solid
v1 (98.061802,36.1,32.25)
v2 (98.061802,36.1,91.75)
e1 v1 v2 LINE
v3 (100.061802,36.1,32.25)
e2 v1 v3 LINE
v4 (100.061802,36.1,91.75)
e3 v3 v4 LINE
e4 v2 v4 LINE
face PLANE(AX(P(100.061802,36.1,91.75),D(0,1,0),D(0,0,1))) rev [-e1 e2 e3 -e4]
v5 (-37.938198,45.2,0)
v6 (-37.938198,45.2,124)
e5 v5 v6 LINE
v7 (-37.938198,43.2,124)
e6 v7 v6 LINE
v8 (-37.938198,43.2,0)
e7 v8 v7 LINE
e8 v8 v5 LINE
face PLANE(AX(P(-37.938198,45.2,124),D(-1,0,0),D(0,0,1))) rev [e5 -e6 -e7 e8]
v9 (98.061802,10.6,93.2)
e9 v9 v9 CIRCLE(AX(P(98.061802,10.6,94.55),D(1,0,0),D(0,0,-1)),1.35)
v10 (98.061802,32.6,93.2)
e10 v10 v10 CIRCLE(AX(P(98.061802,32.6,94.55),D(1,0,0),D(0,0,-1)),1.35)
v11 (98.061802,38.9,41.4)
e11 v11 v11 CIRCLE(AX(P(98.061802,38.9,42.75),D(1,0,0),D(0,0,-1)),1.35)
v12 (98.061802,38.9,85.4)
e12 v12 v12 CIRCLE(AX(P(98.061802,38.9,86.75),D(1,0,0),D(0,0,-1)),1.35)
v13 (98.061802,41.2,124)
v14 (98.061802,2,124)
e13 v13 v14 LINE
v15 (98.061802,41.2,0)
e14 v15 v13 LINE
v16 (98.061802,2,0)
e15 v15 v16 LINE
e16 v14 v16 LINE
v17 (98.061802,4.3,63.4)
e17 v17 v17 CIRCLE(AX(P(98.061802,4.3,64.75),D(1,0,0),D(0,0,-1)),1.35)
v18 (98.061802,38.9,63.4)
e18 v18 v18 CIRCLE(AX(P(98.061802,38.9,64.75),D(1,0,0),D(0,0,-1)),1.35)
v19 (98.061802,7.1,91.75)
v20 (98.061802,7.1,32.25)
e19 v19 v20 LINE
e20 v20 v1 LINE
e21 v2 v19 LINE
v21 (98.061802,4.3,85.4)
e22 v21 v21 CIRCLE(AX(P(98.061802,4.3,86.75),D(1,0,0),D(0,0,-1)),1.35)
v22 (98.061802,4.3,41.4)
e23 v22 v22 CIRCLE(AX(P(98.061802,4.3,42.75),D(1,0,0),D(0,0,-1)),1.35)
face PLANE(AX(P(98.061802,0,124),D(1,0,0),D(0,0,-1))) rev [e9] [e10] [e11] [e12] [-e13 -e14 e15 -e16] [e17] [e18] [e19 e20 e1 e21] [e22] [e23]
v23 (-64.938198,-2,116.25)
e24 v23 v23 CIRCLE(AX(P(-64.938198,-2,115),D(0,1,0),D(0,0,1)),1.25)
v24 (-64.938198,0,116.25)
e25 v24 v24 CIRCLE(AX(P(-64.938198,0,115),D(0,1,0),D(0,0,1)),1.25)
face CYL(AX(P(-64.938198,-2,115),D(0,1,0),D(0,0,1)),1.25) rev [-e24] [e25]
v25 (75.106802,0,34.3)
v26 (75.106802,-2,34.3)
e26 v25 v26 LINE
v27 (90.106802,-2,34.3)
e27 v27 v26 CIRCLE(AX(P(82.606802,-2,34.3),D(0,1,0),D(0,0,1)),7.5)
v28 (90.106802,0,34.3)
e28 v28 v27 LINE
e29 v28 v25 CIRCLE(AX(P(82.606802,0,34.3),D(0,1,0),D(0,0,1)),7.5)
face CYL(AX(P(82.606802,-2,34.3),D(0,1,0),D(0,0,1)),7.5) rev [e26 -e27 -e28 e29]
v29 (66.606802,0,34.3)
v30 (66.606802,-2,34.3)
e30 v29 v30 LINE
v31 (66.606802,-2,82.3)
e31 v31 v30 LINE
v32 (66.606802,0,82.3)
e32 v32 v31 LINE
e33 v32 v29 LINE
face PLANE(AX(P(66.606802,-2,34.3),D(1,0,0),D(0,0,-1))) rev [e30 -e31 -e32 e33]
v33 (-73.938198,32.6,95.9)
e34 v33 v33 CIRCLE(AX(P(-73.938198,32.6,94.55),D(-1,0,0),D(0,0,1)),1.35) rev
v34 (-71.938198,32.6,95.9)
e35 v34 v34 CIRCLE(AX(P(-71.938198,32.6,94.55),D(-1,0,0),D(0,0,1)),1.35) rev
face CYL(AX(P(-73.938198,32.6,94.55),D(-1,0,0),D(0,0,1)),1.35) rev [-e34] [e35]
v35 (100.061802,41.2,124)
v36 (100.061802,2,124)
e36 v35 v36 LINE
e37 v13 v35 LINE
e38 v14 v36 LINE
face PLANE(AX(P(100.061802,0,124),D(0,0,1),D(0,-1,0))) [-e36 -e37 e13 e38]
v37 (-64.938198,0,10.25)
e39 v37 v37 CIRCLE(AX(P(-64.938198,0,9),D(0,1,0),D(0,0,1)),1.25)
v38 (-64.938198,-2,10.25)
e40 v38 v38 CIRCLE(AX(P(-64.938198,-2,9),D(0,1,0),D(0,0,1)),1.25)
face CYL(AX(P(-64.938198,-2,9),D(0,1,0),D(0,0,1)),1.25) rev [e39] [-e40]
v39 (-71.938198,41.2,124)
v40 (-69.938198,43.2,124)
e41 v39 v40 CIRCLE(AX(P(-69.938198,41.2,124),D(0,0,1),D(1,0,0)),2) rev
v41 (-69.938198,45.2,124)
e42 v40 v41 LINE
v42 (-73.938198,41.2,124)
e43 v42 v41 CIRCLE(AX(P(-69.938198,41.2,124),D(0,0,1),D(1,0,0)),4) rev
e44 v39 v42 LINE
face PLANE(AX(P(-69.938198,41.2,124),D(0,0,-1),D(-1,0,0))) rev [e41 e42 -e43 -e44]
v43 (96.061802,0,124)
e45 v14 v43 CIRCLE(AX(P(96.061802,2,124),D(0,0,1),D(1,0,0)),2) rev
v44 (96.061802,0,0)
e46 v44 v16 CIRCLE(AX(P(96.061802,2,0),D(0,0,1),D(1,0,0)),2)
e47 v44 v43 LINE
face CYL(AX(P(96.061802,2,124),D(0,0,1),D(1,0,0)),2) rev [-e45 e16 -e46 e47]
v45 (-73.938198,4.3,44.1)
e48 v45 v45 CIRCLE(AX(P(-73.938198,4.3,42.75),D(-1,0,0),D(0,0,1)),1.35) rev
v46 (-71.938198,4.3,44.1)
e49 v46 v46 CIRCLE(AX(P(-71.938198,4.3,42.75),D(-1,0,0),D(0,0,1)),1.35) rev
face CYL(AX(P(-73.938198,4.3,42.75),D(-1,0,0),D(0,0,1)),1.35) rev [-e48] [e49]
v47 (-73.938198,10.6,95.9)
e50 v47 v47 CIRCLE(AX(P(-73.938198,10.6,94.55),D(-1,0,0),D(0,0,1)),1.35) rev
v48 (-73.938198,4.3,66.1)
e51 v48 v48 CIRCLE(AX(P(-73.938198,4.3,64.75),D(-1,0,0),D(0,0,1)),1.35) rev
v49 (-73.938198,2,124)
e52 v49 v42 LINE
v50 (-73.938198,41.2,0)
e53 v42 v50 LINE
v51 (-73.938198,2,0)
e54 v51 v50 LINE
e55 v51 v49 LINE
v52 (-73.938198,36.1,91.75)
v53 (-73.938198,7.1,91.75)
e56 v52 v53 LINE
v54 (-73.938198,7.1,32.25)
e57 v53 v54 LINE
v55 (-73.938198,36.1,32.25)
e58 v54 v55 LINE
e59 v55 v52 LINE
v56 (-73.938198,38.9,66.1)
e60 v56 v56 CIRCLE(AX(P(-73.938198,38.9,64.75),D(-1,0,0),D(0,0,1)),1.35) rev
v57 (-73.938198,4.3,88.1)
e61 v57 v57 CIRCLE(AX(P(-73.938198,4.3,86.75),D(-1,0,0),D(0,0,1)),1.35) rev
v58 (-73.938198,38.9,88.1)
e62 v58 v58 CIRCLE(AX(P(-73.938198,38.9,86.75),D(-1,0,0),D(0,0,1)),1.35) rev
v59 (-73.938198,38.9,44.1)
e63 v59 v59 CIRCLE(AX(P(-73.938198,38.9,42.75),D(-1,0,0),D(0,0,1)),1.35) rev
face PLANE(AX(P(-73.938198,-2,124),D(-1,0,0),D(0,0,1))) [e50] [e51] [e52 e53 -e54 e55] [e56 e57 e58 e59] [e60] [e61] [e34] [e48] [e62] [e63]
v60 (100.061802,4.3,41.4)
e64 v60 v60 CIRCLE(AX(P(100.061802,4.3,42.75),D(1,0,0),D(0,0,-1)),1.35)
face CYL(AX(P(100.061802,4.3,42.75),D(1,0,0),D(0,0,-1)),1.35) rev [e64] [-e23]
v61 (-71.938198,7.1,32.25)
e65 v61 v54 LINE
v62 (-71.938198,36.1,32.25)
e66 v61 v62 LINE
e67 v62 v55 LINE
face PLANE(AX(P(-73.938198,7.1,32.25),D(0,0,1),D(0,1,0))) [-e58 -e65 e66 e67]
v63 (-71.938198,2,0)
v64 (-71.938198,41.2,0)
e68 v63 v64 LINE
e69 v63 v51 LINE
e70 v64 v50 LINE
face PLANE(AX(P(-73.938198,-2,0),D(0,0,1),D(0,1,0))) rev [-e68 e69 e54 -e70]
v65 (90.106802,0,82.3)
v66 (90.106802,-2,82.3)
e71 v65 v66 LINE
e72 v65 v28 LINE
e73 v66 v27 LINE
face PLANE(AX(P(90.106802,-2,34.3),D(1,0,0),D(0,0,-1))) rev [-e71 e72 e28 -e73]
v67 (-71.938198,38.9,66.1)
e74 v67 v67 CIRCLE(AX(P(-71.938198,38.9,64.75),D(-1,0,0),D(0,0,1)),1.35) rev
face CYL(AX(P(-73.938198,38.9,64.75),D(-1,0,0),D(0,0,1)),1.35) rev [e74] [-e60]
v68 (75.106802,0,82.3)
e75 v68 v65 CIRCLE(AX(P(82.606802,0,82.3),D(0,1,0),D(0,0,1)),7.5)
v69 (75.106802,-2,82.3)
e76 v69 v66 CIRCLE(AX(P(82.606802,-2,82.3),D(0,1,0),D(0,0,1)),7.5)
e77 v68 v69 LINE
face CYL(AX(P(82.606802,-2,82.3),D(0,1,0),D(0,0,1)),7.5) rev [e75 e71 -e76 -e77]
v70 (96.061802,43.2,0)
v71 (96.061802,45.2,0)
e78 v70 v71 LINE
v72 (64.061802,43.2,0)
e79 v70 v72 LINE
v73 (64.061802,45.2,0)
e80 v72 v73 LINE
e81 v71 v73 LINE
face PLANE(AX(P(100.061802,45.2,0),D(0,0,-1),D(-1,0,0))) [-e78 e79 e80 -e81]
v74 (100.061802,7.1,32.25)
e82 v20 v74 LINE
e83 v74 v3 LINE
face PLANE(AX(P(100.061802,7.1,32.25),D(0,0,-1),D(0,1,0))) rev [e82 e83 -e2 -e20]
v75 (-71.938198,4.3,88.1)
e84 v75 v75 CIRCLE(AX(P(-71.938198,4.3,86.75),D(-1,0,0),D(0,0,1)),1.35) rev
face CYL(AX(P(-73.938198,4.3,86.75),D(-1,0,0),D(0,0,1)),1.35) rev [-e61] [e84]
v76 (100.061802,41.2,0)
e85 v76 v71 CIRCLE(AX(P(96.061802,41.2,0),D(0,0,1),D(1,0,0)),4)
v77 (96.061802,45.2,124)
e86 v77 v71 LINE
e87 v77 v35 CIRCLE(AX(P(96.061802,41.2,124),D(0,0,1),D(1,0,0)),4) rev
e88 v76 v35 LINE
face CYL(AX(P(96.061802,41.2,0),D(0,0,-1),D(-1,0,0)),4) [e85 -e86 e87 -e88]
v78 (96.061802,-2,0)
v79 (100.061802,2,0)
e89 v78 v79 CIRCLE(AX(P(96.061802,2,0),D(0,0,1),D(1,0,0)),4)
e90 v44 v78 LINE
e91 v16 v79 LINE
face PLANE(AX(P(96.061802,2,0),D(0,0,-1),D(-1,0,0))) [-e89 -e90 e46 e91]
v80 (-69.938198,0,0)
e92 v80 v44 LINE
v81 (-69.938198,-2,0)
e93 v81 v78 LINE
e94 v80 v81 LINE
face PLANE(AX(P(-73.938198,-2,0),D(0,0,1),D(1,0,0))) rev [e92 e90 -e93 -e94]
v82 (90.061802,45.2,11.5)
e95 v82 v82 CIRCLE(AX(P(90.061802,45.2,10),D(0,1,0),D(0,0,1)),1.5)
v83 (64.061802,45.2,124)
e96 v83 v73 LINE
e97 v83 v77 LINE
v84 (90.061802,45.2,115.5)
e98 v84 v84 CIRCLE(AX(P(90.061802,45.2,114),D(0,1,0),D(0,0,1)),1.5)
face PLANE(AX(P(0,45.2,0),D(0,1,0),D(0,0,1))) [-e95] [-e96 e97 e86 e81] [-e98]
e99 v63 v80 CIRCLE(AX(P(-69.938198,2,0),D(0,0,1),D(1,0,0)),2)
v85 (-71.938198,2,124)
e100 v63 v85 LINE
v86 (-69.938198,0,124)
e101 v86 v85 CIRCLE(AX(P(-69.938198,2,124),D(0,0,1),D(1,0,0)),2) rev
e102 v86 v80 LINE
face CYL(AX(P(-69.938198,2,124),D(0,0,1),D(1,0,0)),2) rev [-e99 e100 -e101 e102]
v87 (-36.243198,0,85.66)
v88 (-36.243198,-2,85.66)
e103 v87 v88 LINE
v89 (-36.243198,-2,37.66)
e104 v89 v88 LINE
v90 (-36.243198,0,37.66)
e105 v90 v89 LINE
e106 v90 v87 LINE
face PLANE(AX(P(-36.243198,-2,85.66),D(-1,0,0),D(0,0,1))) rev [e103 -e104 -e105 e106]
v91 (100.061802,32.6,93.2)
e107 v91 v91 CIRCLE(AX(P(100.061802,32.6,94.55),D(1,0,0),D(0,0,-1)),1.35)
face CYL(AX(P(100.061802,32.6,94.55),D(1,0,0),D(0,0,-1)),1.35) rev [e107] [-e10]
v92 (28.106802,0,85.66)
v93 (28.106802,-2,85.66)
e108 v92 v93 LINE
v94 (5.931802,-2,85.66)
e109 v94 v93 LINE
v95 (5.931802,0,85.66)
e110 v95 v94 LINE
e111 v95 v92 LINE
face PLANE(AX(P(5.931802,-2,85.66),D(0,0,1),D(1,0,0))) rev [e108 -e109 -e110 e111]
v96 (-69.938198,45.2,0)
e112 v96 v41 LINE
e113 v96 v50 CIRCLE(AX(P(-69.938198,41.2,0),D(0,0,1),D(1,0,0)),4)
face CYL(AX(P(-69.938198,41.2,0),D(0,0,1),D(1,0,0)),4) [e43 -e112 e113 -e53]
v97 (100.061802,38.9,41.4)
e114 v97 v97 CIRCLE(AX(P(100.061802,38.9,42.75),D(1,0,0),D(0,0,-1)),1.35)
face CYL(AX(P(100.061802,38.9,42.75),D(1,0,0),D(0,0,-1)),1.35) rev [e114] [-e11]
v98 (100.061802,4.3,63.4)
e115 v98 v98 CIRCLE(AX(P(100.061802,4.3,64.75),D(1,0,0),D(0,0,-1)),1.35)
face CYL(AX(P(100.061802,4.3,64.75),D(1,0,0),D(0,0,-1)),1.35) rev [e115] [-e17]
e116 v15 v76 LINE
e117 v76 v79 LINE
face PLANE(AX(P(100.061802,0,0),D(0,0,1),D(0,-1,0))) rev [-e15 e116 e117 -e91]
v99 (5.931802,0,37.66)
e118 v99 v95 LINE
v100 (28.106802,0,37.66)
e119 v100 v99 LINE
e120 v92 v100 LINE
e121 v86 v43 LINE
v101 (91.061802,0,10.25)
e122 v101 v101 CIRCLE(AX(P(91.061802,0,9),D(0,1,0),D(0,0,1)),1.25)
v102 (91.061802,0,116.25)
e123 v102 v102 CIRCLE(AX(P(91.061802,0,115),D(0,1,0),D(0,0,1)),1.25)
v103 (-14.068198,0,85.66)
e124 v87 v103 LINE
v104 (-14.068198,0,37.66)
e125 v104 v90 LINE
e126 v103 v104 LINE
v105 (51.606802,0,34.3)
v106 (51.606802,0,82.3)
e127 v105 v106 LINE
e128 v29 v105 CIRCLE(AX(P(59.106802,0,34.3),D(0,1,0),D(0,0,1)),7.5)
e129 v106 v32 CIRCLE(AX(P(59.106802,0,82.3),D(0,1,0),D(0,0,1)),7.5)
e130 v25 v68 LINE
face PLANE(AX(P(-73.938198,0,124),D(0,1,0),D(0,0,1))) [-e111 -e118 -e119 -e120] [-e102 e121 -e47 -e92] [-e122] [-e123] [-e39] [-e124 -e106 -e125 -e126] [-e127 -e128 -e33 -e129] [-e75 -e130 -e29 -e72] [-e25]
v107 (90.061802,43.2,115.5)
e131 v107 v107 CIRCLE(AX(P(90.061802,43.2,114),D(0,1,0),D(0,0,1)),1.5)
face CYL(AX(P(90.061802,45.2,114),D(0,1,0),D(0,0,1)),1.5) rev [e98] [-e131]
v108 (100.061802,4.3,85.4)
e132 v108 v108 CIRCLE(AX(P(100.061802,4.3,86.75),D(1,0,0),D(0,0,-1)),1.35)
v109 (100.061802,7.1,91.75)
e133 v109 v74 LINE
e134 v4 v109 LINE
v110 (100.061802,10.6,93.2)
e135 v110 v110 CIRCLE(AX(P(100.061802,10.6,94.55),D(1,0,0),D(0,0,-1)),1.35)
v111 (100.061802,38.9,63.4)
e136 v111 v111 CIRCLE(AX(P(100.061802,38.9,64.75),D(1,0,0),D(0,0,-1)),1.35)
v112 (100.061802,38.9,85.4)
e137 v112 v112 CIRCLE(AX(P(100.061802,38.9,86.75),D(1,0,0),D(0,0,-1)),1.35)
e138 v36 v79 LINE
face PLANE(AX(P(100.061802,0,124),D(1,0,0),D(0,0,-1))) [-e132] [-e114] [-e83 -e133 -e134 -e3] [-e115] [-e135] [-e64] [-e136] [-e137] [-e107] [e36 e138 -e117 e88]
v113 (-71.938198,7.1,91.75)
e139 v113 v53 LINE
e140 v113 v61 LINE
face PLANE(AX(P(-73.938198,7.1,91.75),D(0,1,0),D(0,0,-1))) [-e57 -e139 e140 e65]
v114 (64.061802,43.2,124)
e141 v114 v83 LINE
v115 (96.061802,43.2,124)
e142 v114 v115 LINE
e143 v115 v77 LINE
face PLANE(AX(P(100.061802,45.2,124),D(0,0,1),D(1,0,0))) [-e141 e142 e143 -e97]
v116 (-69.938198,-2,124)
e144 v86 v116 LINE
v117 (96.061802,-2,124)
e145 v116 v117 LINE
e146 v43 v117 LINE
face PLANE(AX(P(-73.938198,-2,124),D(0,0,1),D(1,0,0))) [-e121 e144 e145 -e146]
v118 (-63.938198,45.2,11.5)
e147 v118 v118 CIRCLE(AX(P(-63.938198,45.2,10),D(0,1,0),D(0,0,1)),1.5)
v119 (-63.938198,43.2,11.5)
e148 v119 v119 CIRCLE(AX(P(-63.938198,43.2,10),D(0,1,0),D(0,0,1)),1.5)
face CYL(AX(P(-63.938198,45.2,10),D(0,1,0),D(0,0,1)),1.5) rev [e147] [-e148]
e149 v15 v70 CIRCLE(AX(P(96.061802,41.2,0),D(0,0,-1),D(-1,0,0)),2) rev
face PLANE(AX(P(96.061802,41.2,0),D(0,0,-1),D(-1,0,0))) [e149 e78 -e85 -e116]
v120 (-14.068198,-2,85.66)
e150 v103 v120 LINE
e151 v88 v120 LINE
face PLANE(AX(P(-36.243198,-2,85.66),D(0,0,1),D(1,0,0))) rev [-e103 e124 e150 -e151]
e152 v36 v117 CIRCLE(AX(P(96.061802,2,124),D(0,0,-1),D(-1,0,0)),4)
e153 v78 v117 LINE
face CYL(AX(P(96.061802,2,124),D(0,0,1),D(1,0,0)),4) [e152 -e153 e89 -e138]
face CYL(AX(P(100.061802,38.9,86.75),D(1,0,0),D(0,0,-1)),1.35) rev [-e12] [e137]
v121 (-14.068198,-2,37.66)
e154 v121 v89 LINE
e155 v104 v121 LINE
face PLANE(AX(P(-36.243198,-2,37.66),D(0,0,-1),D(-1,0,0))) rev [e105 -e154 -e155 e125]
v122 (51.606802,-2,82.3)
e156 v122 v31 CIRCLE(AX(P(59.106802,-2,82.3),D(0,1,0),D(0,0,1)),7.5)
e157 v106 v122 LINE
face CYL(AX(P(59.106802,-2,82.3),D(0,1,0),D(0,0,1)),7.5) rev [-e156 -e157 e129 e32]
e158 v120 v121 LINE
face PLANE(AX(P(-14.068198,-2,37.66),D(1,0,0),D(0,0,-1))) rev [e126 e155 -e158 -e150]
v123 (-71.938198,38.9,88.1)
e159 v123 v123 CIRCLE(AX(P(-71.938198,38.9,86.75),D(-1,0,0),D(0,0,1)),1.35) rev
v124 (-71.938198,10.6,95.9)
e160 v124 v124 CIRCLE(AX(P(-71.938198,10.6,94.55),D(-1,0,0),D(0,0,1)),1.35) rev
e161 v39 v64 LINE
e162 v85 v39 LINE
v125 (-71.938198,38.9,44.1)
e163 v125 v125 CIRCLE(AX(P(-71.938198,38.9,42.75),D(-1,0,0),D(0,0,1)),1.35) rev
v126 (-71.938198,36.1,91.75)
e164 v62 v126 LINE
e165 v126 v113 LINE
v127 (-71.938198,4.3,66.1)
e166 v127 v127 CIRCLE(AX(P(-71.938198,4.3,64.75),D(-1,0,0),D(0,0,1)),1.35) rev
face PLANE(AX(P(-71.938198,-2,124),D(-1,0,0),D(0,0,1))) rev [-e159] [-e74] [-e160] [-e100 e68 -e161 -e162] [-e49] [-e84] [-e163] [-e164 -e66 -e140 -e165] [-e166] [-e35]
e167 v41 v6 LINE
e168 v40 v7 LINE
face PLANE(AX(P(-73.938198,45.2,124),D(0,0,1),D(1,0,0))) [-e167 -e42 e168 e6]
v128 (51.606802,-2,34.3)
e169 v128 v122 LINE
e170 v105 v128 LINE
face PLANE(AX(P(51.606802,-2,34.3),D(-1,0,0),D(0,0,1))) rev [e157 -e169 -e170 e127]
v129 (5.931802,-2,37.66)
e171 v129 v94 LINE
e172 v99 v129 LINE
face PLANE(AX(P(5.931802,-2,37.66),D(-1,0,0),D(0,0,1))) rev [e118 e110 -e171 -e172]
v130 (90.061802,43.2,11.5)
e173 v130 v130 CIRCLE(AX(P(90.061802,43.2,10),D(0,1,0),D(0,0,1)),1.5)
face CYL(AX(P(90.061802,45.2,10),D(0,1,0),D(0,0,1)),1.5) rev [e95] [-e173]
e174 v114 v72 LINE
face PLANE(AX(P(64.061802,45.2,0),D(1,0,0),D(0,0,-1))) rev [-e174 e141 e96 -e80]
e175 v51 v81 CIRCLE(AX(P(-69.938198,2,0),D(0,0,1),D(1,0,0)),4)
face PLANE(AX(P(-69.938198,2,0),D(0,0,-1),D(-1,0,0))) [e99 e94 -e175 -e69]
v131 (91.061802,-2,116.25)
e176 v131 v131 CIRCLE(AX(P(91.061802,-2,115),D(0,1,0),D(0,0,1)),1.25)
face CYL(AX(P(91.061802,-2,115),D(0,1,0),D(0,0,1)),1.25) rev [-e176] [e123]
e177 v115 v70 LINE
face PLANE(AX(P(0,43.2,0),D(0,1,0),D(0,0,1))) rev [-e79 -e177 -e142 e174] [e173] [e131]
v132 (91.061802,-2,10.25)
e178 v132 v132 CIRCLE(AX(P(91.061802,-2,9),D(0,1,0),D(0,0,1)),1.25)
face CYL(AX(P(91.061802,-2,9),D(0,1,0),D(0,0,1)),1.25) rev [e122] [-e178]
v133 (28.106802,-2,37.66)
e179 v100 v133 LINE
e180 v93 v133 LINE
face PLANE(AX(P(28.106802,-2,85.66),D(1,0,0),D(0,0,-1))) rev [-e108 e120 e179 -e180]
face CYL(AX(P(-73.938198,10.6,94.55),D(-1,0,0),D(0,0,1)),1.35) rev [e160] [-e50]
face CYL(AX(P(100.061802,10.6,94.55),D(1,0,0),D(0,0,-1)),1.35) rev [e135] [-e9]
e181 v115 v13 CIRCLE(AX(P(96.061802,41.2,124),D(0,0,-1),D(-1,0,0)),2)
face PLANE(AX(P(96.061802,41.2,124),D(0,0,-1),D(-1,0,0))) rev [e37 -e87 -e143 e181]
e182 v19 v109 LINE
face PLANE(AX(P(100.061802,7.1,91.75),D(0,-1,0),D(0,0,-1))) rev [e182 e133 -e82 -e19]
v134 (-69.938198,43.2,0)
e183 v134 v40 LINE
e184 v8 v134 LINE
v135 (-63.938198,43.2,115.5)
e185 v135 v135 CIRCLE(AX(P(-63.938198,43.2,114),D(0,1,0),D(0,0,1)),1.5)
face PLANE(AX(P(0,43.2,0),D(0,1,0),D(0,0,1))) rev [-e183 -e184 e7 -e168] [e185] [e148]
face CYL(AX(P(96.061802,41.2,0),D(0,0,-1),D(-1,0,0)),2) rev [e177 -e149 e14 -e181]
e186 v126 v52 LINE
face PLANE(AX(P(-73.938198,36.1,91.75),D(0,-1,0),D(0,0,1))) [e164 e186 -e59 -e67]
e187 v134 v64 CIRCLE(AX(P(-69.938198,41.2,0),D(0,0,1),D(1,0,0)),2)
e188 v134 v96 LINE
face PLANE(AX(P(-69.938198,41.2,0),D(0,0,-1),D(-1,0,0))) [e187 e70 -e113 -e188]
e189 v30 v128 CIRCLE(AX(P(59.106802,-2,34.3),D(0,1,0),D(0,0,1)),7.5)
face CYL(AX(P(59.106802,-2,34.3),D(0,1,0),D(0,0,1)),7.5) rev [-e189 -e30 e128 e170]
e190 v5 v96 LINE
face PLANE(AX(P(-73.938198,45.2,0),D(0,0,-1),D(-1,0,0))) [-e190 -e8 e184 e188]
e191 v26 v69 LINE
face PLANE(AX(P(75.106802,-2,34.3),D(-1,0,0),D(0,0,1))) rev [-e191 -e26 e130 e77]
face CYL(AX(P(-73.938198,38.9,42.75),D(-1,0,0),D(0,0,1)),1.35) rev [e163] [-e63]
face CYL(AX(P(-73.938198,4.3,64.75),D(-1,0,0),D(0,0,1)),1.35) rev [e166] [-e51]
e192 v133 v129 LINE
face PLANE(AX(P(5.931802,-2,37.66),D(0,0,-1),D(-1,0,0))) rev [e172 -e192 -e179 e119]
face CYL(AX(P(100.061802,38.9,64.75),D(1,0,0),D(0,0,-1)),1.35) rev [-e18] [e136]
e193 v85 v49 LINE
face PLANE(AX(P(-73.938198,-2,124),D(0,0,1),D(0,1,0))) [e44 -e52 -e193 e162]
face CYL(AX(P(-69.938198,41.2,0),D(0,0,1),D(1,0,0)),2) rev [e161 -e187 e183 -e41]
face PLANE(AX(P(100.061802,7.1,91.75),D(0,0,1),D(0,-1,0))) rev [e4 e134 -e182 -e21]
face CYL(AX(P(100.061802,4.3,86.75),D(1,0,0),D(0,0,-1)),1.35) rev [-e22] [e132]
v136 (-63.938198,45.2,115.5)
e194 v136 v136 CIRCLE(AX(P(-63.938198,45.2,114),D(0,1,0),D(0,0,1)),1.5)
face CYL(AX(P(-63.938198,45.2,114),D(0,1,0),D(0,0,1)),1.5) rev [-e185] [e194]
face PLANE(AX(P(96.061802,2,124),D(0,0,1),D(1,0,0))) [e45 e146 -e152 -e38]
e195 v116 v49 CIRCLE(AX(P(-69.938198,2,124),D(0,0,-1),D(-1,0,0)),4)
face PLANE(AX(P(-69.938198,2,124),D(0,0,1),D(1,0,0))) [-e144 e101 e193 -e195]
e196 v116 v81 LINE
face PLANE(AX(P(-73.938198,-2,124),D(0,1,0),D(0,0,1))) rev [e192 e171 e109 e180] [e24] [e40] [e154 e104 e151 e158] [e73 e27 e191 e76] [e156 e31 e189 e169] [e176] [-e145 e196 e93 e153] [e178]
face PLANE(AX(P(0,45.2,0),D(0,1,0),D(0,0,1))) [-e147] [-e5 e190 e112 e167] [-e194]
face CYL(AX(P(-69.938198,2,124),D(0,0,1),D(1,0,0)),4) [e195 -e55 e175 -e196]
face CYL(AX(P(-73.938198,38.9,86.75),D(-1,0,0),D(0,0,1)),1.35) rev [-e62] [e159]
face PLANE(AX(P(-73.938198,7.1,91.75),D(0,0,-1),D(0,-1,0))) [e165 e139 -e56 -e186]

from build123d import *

# Parameters (mm, degrees)
ESBO_O1_W                 = 174
ESBO_O1_H                 = 2
EXTRUS_O_FINA1_DEPTH      = 124
ESBO_O2_R                 = 1.25
CORTE_EXTRUS_O1_DEPTH     = 10
ESBO_O3_W                 = 2
ESBO_O3_H                 = 124
RESSALTO_EXTRUS_O1_DEPTH  = 45.2
ESBO_O4_W                 = 124
ESBO_O4_H                 = 2
RESSALTO_EXTRUS_O2_DEPTH  = 34
ESBO_O5_W                 = 124
ESBO_O5_H                 = 2
RESSALTO_EXTRUS_O3_DEPTH  = 34
CORTE_EXTRUS_O2_REACH     = 220.392
ESBO_O6_R                 = 1.35
ESBO_O6_W                 = 59.5
ESBO_O6_H                 = 29
ESBO_O7_R                 = 1.5
CORTE_EXTRUS_O3_DEPTH     = 2
ESBO_O8_W                 = 22.175
ESBO_O8_H                 = 48
CORTE_EXTRUS_O4_DEPTH     = 2
CONVERTER_S_LIDO1_DEPTH   = 124
CONVERTER_S_LIDO1_2_DEPTH = 124


# Read off the part's stored shape, not the designer's step: Converter-Sólido1
with BuildPart() as part:
    # Esboço1 → Extrusão-Fina1 (new body)
    with BuildSketch(Plane.XY):
        with Locations((13.061802497, -1)):
            Rectangle(ESBO_O1_W, ESBO_O1_H)
    extrude(amount=EXTRUS_O_FINA1_DEPTH)

    # Esboço2 → Corte-extrusão1 (cut)
    with BuildSketch(Plane(origin=(0, 0, 0), x_dir=(1, 0, 0), z_dir=(0, 1, 0))):
        with Locations(Location((-64.938197503, -9, 0), (0, 0, 270))):
            Circle(ESBO_O2_R)
        with Locations(Location((-64.938197503, -115, 0), (0, 0, 270))):
            Circle(ESBO_O2_R)
        with Locations(Location((91.061802497, -115, 0), (0, 0, 270))):
            Circle(ESBO_O2_R)
        with Locations(Location((91.061802497, -9, 0), (0, 0, 270))):
            Circle(ESBO_O2_R)
    extrude(amount=-CORTE_EXTRUS_O1_DEPTH, mode=Mode.SUBTRACT)

    # Esboço3 → Ressalto-extrusão1 (add)
    with BuildSketch(Plane(origin=(0, 0, 0), x_dir=(1, 0, 0), z_dir=(0, 1, 0))):
        with Locations((-72.938197503, -62)):
            Rectangle(ESBO_O3_W, ESBO_O3_H)
        with Locations((99.061802497, -62)):
            Rectangle(ESBO_O3_W, ESBO_O3_H)
    extrude(amount=RESSALTO_EXTRUS_O1_DEPTH)

    # Esboço4 → Ressalto-extrusão2 (add)
    with BuildSketch(Plane(origin=(-71.938197503, 0, 0), x_dir=(0, 0, -1), z_dir=(1, 0, 0))):
        with Locations((-62, 44.2)):
            Rectangle(ESBO_O4_W, ESBO_O4_H)
    extrude(amount=RESSALTO_EXTRUS_O2_DEPTH)

    # Esboço5 → Ressalto-extrusão3 (add)
    with BuildSketch(Plane.ZY.offset(-98.061802497)):
        with Locations((62, 44.2)):
            Rectangle(ESBO_O5_W, ESBO_O5_H)
    extrude(amount=RESSALTO_EXTRUS_O3_DEPTH)

    # Esboço6 → Corte-extrusão2 (cut, up to next)
    with BuildSketch(Plane(origin=(100.061802497, 0, 0), x_dir=(0, 0, -1), z_dir=(1, 0, 0)), mode=Mode.PRIVATE) as corte_extrus_o2_sk1:
        with Locations(Location((-86.75, 38.9, 0), (0, 0, 180))):
            Circle(ESBO_O6_R)
    corte_extrus_o2_tool1 = extrude(corte_extrus_o2_sk1.sketch, amount=-CORTE_EXTRUS_O2_REACH, mode=Mode.PRIVATE) & part.part
    # Esboço6 → Corte-extrusão2 (cut, up to next)
    with BuildSketch(Plane(origin=(100.061802497, 0, 0), x_dir=(0, 0, -1), z_dir=(1, 0, 0)), mode=Mode.PRIVATE) as corte_extrus_o2_sk2:
        with Locations(Location((-64.75, 38.9, 0), (0, 0, 180))):
            Circle(ESBO_O6_R)
    corte_extrus_o2_tool2 = extrude(corte_extrus_o2_sk2.sketch, amount=-CORTE_EXTRUS_O2_REACH, mode=Mode.PRIVATE) & part.part
    # Esboço6 → Corte-extrusão2 (cut, up to next)
    with BuildSketch(Plane(origin=(100.061802497, 0, 0), x_dir=(0, 0, -1), z_dir=(1, 0, 0)), mode=Mode.PRIVATE) as corte_extrus_o2_sk3:
        with Locations(Location((-42.75, 38.9, 0), (0, 0, 180))):
            Circle(ESBO_O6_R)
    corte_extrus_o2_tool3 = extrude(corte_extrus_o2_sk3.sketch, amount=-CORTE_EXTRUS_O2_REACH, mode=Mode.PRIVATE) & part.part
    # Esboço6 → Corte-extrusão2 (cut, up to next)
    with BuildSketch(Plane(origin=(100.061802497, 0, 0), x_dir=(0, 0, -1), z_dir=(1, 0, 0)), mode=Mode.PRIVATE) as corte_extrus_o2_sk4:
        with Locations(Location((-86.75, 4.3, 0), (0, 0, 180))):
            Circle(ESBO_O6_R)
    corte_extrus_o2_tool4 = extrude(corte_extrus_o2_sk4.sketch, amount=-CORTE_EXTRUS_O2_REACH, mode=Mode.PRIVATE) & part.part
    # Esboço6 → Corte-extrusão2 (cut, up to next)
    with BuildSketch(Plane(origin=(100.061802497, 0, 0), x_dir=(0, 0, -1), z_dir=(1, 0, 0)), mode=Mode.PRIVATE) as corte_extrus_o2_sk5:
        with Locations(Location((-64.75, 4.3, 0), (0, 0, 180))):
            Circle(ESBO_O6_R)
    corte_extrus_o2_tool5 = extrude(corte_extrus_o2_sk5.sketch, amount=-CORTE_EXTRUS_O2_REACH, mode=Mode.PRIVATE) & part.part
    # Esboço6 → Corte-extrusão2 (cut, up to next)
    with BuildSketch(Plane(origin=(100.061802497, 0, 0), x_dir=(0, 0, -1), z_dir=(1, 0, 0)), mode=Mode.PRIVATE) as corte_extrus_o2_sk6:
        with Locations(Location((-42.75, 4.3, 0), (0, 0, 180))):
            Circle(ESBO_O6_R)
    corte_extrus_o2_tool6 = extrude(corte_extrus_o2_sk6.sketch, amount=-CORTE_EXTRUS_O2_REACH, mode=Mode.PRIVATE) & part.part
    # Esboço6 → Corte-extrusão2 (cut, up to next)
    with BuildSketch(Plane(origin=(100.061802497, 0, 0), x_dir=(0, 0, -1), z_dir=(1, 0, 0)), mode=Mode.PRIVATE) as corte_extrus_o2_sk7:
        with Locations(Location((-94.55, 32.6, 0), (0, 0, 180))):
            Circle(ESBO_O6_R)
    corte_extrus_o2_tool7 = extrude(corte_extrus_o2_sk7.sketch, amount=-CORTE_EXTRUS_O2_REACH, mode=Mode.PRIVATE) & part.part
    # Esboço6 → Corte-extrusão2 (cut, up to next)
    with BuildSketch(Plane(origin=(100.061802497, 0, 0), x_dir=(0, 0, -1), z_dir=(1, 0, 0)), mode=Mode.PRIVATE) as corte_extrus_o2_sk8:
        with Locations(Location((-94.55, 10.6, 0), (0, 0, 180))):
            Circle(ESBO_O6_R)
    corte_extrus_o2_tool8 = extrude(corte_extrus_o2_sk8.sketch, amount=-CORTE_EXTRUS_O2_REACH, mode=Mode.PRIVATE) & part.part
    # Esboço6 → Corte-extrusão2 (cut, up to next)
    with BuildSketch(Plane(origin=(100.061802497, 0, 0), x_dir=(0, 0, -1), z_dir=(1, 0, 0)), mode=Mode.PRIVATE) as corte_extrus_o2_sk9:
        with Locations((-62, 21.6)):
            Rectangle(ESBO_O6_W, ESBO_O6_H)
    corte_extrus_o2_tool9 = extrude(corte_extrus_o2_sk9.sketch, amount=-CORTE_EXTRUS_O2_REACH, mode=Mode.PRIVATE) & part.part
    add(corte_extrus_o2_tool1.solids().sort_by_distance((100.061802, 38.9, 86.75))[0], mode=Mode.SUBTRACT)
    add(corte_extrus_o2_tool1.solids().sort_by_distance((100.061802, 38.9, 86.75))[1], mode=Mode.SUBTRACT)
    add(corte_extrus_o2_tool2.solids().sort_by_distance((100.061802, 38.9, 64.75))[0], mode=Mode.SUBTRACT)
    add(corte_extrus_o2_tool2.solids().sort_by_distance((100.061802, 38.9, 64.75))[1], mode=Mode.SUBTRACT)
    add(corte_extrus_o2_tool3.solids().sort_by_distance((100.061802, 38.9, 42.75))[0], mode=Mode.SUBTRACT)
    add(corte_extrus_o2_tool3.solids().sort_by_distance((100.061802, 38.9, 42.75))[1], mode=Mode.SUBTRACT)
    add(corte_extrus_o2_tool4.solids().sort_by_distance((100.061802, 4.3, 86.75))[0], mode=Mode.SUBTRACT)
    add(corte_extrus_o2_tool4.solids().sort_by_distance((100.061802, 4.3, 86.75))[1], mode=Mode.SUBTRACT)
    add(corte_extrus_o2_tool5.solids().sort_by_distance((100.061802, 4.3, 64.75))[0], mode=Mode.SUBTRACT)
    add(corte_extrus_o2_tool5.solids().sort_by_distance((100.061802, 4.3, 64.75))[1], mode=Mode.SUBTRACT)
    add(corte_extrus_o2_tool6.solids().sort_by_distance((100.061802, 4.3, 42.75))[0], mode=Mode.SUBTRACT)
    add(corte_extrus_o2_tool6.solids().sort_by_distance((100.061802, 4.3, 42.75))[1], mode=Mode.SUBTRACT)
    add(corte_extrus_o2_tool7.solids().sort_by_distance((100.061802, 32.6, 94.55))[0], mode=Mode.SUBTRACT)
    add(corte_extrus_o2_tool7.solids().sort_by_distance((100.061802, 32.6, 94.55))[1], mode=Mode.SUBTRACT)
    add(corte_extrus_o2_tool8.solids().sort_by_distance((100.061802, 10.6, 94.55))[0], mode=Mode.SUBTRACT)
    add(corte_extrus_o2_tool8.solids().sort_by_distance((100.061802, 10.6, 94.55))[1], mode=Mode.SUBTRACT)
    add(corte_extrus_o2_tool9.solids().sort_by_distance((100.061802, 21.6, 62))[0], mode=Mode.SUBTRACT)
    add(corte_extrus_o2_tool9.solids().sort_by_distance((100.061802, 21.6, 62))[1], mode=Mode.SUBTRACT)

    # Esboço7 → Corte-extrusão3 (cut)
    with BuildSketch(Plane(origin=(0, 45.2, 0), x_dir=(1, 0, 0), z_dir=(0, 1, 0))):
        with Locations(Location((-63.938197503, -10, 0), (0, 0, 270))):
            Circle(ESBO_O7_R)
        with Locations(Location((90.061802497, -10, 0), (0, 0, 270))):
            Circle(ESBO_O7_R)
        with Locations(Location((90.061802497, -114, 0), (0, 0, 270))):
            Circle(ESBO_O7_R)
        with Locations(Location((-63.938197503, -114, 0), (0, 0, 270))):
            Circle(ESBO_O7_R)
    extrude(amount=-CORTE_EXTRUS_O3_DEPTH, mode=Mode.SUBTRACT)

    # Esboço8 → Corte-extrusão4 (cut)
    with BuildSketch(Plane(origin=(0, 0, 0), x_dir=(1, 0, 0), z_dir=(0, 1, 0))):
        with Locations((-25.155697503, -61.66)):
            Rectangle(ESBO_O8_W, ESBO_O8_H)
        with BuildLine():
            Line((90.106802497, -34.3), (90.106802497, -82.3))
            ThreePointArc((90.106802497, -82.3), (82.606802497, -89.8), (75.106802497, -82.3))
            Line((75.106802497, -82.3), (75.106802497, -34.3))
            ThreePointArc((75.106802497, -34.3), (82.606802497, -26.8), (90.106802497, -34.3))
        make_face()
        with Locations((17.019302497, -61.66)):
            Rectangle(ESBO_O8_W, ESBO_O8_H)
        with BuildLine():
            Line((66.606802497, -34.3), (66.606802497, -82.3))
            ThreePointArc((66.606802497, -82.3), (59.106802497, -89.8), (51.606802497, -82.3))
            Line((51.606802497, -82.3), (51.606802497, -34.3))
            ThreePointArc((51.606802497, -34.3), (59.106802497, -26.8), (66.606802497, -34.3))
        make_face()
    extrude(amount=-CORTE_EXTRUS_O4_DEPTH, mode=Mode.SUBTRACT)

    # Converter-Sólido1 outline → Converter-Sólido1 (cut)
    with BuildSketch(Plane.XY):
        with BuildLine():
            ThreePointArc((96.061802497, 45.2), (98.890229621, 44.028427124), (100.061802497, 41.2))
            Line((100.061802497, 41.2), (100.061802497, 45.2))
            Line((100.061802497, 45.2), (96.061802497, 45.2))
        make_face()
        with BuildLine():
            ThreePointArc((100.061802497, 2), (98.890229621, -0.828427125), (96.061802497, -2))
            Line((96.061802497, -2), (100.061802497, -2))
            Line((100.061802497, -2), (100.061802497, 2))
        make_face()
        with BuildLine():
            ThreePointArc((-69.938197503, -2), (-72.766624628, -0.828427125), (-73.938197503, 2))
            Line((-73.938197503, 2), (-73.938197503, -2))
            Line((-73.938197503, -2), (-69.938197503, -2))
        make_face()
        with BuildLine():
            ThreePointArc((-73.938197503, 41.2), (-72.766624628, 44.028427125), (-69.938197503, 45.2))
            Line((-69.938197503, 45.2), (-73.938197503, 45.2))
            Line((-73.938197503, 45.2), (-73.938197503, 41.2))
        make_face()
    extrude(amount=CONVERTER_S_LIDO1_DEPTH, mode=Mode.SUBTRACT)

    # Converter-S_lido1 2 outline → Converter-S_lido1 2 (add)
    with BuildSketch(Plane.XY):
        with BuildLine():
            ThreePointArc((96.061802497, 43.2), (97.476016059, 42.614213562), (98.061802497, 41.2))
            Line((98.061802497, 41.2), (98.061802497, 43.2))
            Line((98.061802497, 43.2), (96.061802497, 43.2))
        make_face()
        with BuildLine():
            ThreePointArc((98.061802497, 2), (97.476016059, 0.585786438), (96.061802497, 0))
            Line((96.061802497, 0), (98.061802497, 0))
            Line((98.061802497, 0), (98.061802497, 2))
        make_face()
        with BuildLine():
            ThreePointArc((-69.938197503, 0), (-71.352411066, 0.585786437), (-71.938197503, 2))
            Line((-71.938197503, 2), (-71.938197503, 0))
            Line((-71.938197503, 0), (-69.938197503, 0))
        make_face()
        with BuildLine():
            ThreePointArc((-71.938197503, 41.2), (-71.352411066, 42.614213563), (-69.938197503, 43.2))
            Line((-69.938197503, 43.2), (-71.938197503, 43.2))
            Line((-71.938197503, 43.2), (-71.938197503, 41.2))
        make_face()
    extrude(amount=CONVERTER_S_LIDO1_2_DEPTH)


solid = part.part
